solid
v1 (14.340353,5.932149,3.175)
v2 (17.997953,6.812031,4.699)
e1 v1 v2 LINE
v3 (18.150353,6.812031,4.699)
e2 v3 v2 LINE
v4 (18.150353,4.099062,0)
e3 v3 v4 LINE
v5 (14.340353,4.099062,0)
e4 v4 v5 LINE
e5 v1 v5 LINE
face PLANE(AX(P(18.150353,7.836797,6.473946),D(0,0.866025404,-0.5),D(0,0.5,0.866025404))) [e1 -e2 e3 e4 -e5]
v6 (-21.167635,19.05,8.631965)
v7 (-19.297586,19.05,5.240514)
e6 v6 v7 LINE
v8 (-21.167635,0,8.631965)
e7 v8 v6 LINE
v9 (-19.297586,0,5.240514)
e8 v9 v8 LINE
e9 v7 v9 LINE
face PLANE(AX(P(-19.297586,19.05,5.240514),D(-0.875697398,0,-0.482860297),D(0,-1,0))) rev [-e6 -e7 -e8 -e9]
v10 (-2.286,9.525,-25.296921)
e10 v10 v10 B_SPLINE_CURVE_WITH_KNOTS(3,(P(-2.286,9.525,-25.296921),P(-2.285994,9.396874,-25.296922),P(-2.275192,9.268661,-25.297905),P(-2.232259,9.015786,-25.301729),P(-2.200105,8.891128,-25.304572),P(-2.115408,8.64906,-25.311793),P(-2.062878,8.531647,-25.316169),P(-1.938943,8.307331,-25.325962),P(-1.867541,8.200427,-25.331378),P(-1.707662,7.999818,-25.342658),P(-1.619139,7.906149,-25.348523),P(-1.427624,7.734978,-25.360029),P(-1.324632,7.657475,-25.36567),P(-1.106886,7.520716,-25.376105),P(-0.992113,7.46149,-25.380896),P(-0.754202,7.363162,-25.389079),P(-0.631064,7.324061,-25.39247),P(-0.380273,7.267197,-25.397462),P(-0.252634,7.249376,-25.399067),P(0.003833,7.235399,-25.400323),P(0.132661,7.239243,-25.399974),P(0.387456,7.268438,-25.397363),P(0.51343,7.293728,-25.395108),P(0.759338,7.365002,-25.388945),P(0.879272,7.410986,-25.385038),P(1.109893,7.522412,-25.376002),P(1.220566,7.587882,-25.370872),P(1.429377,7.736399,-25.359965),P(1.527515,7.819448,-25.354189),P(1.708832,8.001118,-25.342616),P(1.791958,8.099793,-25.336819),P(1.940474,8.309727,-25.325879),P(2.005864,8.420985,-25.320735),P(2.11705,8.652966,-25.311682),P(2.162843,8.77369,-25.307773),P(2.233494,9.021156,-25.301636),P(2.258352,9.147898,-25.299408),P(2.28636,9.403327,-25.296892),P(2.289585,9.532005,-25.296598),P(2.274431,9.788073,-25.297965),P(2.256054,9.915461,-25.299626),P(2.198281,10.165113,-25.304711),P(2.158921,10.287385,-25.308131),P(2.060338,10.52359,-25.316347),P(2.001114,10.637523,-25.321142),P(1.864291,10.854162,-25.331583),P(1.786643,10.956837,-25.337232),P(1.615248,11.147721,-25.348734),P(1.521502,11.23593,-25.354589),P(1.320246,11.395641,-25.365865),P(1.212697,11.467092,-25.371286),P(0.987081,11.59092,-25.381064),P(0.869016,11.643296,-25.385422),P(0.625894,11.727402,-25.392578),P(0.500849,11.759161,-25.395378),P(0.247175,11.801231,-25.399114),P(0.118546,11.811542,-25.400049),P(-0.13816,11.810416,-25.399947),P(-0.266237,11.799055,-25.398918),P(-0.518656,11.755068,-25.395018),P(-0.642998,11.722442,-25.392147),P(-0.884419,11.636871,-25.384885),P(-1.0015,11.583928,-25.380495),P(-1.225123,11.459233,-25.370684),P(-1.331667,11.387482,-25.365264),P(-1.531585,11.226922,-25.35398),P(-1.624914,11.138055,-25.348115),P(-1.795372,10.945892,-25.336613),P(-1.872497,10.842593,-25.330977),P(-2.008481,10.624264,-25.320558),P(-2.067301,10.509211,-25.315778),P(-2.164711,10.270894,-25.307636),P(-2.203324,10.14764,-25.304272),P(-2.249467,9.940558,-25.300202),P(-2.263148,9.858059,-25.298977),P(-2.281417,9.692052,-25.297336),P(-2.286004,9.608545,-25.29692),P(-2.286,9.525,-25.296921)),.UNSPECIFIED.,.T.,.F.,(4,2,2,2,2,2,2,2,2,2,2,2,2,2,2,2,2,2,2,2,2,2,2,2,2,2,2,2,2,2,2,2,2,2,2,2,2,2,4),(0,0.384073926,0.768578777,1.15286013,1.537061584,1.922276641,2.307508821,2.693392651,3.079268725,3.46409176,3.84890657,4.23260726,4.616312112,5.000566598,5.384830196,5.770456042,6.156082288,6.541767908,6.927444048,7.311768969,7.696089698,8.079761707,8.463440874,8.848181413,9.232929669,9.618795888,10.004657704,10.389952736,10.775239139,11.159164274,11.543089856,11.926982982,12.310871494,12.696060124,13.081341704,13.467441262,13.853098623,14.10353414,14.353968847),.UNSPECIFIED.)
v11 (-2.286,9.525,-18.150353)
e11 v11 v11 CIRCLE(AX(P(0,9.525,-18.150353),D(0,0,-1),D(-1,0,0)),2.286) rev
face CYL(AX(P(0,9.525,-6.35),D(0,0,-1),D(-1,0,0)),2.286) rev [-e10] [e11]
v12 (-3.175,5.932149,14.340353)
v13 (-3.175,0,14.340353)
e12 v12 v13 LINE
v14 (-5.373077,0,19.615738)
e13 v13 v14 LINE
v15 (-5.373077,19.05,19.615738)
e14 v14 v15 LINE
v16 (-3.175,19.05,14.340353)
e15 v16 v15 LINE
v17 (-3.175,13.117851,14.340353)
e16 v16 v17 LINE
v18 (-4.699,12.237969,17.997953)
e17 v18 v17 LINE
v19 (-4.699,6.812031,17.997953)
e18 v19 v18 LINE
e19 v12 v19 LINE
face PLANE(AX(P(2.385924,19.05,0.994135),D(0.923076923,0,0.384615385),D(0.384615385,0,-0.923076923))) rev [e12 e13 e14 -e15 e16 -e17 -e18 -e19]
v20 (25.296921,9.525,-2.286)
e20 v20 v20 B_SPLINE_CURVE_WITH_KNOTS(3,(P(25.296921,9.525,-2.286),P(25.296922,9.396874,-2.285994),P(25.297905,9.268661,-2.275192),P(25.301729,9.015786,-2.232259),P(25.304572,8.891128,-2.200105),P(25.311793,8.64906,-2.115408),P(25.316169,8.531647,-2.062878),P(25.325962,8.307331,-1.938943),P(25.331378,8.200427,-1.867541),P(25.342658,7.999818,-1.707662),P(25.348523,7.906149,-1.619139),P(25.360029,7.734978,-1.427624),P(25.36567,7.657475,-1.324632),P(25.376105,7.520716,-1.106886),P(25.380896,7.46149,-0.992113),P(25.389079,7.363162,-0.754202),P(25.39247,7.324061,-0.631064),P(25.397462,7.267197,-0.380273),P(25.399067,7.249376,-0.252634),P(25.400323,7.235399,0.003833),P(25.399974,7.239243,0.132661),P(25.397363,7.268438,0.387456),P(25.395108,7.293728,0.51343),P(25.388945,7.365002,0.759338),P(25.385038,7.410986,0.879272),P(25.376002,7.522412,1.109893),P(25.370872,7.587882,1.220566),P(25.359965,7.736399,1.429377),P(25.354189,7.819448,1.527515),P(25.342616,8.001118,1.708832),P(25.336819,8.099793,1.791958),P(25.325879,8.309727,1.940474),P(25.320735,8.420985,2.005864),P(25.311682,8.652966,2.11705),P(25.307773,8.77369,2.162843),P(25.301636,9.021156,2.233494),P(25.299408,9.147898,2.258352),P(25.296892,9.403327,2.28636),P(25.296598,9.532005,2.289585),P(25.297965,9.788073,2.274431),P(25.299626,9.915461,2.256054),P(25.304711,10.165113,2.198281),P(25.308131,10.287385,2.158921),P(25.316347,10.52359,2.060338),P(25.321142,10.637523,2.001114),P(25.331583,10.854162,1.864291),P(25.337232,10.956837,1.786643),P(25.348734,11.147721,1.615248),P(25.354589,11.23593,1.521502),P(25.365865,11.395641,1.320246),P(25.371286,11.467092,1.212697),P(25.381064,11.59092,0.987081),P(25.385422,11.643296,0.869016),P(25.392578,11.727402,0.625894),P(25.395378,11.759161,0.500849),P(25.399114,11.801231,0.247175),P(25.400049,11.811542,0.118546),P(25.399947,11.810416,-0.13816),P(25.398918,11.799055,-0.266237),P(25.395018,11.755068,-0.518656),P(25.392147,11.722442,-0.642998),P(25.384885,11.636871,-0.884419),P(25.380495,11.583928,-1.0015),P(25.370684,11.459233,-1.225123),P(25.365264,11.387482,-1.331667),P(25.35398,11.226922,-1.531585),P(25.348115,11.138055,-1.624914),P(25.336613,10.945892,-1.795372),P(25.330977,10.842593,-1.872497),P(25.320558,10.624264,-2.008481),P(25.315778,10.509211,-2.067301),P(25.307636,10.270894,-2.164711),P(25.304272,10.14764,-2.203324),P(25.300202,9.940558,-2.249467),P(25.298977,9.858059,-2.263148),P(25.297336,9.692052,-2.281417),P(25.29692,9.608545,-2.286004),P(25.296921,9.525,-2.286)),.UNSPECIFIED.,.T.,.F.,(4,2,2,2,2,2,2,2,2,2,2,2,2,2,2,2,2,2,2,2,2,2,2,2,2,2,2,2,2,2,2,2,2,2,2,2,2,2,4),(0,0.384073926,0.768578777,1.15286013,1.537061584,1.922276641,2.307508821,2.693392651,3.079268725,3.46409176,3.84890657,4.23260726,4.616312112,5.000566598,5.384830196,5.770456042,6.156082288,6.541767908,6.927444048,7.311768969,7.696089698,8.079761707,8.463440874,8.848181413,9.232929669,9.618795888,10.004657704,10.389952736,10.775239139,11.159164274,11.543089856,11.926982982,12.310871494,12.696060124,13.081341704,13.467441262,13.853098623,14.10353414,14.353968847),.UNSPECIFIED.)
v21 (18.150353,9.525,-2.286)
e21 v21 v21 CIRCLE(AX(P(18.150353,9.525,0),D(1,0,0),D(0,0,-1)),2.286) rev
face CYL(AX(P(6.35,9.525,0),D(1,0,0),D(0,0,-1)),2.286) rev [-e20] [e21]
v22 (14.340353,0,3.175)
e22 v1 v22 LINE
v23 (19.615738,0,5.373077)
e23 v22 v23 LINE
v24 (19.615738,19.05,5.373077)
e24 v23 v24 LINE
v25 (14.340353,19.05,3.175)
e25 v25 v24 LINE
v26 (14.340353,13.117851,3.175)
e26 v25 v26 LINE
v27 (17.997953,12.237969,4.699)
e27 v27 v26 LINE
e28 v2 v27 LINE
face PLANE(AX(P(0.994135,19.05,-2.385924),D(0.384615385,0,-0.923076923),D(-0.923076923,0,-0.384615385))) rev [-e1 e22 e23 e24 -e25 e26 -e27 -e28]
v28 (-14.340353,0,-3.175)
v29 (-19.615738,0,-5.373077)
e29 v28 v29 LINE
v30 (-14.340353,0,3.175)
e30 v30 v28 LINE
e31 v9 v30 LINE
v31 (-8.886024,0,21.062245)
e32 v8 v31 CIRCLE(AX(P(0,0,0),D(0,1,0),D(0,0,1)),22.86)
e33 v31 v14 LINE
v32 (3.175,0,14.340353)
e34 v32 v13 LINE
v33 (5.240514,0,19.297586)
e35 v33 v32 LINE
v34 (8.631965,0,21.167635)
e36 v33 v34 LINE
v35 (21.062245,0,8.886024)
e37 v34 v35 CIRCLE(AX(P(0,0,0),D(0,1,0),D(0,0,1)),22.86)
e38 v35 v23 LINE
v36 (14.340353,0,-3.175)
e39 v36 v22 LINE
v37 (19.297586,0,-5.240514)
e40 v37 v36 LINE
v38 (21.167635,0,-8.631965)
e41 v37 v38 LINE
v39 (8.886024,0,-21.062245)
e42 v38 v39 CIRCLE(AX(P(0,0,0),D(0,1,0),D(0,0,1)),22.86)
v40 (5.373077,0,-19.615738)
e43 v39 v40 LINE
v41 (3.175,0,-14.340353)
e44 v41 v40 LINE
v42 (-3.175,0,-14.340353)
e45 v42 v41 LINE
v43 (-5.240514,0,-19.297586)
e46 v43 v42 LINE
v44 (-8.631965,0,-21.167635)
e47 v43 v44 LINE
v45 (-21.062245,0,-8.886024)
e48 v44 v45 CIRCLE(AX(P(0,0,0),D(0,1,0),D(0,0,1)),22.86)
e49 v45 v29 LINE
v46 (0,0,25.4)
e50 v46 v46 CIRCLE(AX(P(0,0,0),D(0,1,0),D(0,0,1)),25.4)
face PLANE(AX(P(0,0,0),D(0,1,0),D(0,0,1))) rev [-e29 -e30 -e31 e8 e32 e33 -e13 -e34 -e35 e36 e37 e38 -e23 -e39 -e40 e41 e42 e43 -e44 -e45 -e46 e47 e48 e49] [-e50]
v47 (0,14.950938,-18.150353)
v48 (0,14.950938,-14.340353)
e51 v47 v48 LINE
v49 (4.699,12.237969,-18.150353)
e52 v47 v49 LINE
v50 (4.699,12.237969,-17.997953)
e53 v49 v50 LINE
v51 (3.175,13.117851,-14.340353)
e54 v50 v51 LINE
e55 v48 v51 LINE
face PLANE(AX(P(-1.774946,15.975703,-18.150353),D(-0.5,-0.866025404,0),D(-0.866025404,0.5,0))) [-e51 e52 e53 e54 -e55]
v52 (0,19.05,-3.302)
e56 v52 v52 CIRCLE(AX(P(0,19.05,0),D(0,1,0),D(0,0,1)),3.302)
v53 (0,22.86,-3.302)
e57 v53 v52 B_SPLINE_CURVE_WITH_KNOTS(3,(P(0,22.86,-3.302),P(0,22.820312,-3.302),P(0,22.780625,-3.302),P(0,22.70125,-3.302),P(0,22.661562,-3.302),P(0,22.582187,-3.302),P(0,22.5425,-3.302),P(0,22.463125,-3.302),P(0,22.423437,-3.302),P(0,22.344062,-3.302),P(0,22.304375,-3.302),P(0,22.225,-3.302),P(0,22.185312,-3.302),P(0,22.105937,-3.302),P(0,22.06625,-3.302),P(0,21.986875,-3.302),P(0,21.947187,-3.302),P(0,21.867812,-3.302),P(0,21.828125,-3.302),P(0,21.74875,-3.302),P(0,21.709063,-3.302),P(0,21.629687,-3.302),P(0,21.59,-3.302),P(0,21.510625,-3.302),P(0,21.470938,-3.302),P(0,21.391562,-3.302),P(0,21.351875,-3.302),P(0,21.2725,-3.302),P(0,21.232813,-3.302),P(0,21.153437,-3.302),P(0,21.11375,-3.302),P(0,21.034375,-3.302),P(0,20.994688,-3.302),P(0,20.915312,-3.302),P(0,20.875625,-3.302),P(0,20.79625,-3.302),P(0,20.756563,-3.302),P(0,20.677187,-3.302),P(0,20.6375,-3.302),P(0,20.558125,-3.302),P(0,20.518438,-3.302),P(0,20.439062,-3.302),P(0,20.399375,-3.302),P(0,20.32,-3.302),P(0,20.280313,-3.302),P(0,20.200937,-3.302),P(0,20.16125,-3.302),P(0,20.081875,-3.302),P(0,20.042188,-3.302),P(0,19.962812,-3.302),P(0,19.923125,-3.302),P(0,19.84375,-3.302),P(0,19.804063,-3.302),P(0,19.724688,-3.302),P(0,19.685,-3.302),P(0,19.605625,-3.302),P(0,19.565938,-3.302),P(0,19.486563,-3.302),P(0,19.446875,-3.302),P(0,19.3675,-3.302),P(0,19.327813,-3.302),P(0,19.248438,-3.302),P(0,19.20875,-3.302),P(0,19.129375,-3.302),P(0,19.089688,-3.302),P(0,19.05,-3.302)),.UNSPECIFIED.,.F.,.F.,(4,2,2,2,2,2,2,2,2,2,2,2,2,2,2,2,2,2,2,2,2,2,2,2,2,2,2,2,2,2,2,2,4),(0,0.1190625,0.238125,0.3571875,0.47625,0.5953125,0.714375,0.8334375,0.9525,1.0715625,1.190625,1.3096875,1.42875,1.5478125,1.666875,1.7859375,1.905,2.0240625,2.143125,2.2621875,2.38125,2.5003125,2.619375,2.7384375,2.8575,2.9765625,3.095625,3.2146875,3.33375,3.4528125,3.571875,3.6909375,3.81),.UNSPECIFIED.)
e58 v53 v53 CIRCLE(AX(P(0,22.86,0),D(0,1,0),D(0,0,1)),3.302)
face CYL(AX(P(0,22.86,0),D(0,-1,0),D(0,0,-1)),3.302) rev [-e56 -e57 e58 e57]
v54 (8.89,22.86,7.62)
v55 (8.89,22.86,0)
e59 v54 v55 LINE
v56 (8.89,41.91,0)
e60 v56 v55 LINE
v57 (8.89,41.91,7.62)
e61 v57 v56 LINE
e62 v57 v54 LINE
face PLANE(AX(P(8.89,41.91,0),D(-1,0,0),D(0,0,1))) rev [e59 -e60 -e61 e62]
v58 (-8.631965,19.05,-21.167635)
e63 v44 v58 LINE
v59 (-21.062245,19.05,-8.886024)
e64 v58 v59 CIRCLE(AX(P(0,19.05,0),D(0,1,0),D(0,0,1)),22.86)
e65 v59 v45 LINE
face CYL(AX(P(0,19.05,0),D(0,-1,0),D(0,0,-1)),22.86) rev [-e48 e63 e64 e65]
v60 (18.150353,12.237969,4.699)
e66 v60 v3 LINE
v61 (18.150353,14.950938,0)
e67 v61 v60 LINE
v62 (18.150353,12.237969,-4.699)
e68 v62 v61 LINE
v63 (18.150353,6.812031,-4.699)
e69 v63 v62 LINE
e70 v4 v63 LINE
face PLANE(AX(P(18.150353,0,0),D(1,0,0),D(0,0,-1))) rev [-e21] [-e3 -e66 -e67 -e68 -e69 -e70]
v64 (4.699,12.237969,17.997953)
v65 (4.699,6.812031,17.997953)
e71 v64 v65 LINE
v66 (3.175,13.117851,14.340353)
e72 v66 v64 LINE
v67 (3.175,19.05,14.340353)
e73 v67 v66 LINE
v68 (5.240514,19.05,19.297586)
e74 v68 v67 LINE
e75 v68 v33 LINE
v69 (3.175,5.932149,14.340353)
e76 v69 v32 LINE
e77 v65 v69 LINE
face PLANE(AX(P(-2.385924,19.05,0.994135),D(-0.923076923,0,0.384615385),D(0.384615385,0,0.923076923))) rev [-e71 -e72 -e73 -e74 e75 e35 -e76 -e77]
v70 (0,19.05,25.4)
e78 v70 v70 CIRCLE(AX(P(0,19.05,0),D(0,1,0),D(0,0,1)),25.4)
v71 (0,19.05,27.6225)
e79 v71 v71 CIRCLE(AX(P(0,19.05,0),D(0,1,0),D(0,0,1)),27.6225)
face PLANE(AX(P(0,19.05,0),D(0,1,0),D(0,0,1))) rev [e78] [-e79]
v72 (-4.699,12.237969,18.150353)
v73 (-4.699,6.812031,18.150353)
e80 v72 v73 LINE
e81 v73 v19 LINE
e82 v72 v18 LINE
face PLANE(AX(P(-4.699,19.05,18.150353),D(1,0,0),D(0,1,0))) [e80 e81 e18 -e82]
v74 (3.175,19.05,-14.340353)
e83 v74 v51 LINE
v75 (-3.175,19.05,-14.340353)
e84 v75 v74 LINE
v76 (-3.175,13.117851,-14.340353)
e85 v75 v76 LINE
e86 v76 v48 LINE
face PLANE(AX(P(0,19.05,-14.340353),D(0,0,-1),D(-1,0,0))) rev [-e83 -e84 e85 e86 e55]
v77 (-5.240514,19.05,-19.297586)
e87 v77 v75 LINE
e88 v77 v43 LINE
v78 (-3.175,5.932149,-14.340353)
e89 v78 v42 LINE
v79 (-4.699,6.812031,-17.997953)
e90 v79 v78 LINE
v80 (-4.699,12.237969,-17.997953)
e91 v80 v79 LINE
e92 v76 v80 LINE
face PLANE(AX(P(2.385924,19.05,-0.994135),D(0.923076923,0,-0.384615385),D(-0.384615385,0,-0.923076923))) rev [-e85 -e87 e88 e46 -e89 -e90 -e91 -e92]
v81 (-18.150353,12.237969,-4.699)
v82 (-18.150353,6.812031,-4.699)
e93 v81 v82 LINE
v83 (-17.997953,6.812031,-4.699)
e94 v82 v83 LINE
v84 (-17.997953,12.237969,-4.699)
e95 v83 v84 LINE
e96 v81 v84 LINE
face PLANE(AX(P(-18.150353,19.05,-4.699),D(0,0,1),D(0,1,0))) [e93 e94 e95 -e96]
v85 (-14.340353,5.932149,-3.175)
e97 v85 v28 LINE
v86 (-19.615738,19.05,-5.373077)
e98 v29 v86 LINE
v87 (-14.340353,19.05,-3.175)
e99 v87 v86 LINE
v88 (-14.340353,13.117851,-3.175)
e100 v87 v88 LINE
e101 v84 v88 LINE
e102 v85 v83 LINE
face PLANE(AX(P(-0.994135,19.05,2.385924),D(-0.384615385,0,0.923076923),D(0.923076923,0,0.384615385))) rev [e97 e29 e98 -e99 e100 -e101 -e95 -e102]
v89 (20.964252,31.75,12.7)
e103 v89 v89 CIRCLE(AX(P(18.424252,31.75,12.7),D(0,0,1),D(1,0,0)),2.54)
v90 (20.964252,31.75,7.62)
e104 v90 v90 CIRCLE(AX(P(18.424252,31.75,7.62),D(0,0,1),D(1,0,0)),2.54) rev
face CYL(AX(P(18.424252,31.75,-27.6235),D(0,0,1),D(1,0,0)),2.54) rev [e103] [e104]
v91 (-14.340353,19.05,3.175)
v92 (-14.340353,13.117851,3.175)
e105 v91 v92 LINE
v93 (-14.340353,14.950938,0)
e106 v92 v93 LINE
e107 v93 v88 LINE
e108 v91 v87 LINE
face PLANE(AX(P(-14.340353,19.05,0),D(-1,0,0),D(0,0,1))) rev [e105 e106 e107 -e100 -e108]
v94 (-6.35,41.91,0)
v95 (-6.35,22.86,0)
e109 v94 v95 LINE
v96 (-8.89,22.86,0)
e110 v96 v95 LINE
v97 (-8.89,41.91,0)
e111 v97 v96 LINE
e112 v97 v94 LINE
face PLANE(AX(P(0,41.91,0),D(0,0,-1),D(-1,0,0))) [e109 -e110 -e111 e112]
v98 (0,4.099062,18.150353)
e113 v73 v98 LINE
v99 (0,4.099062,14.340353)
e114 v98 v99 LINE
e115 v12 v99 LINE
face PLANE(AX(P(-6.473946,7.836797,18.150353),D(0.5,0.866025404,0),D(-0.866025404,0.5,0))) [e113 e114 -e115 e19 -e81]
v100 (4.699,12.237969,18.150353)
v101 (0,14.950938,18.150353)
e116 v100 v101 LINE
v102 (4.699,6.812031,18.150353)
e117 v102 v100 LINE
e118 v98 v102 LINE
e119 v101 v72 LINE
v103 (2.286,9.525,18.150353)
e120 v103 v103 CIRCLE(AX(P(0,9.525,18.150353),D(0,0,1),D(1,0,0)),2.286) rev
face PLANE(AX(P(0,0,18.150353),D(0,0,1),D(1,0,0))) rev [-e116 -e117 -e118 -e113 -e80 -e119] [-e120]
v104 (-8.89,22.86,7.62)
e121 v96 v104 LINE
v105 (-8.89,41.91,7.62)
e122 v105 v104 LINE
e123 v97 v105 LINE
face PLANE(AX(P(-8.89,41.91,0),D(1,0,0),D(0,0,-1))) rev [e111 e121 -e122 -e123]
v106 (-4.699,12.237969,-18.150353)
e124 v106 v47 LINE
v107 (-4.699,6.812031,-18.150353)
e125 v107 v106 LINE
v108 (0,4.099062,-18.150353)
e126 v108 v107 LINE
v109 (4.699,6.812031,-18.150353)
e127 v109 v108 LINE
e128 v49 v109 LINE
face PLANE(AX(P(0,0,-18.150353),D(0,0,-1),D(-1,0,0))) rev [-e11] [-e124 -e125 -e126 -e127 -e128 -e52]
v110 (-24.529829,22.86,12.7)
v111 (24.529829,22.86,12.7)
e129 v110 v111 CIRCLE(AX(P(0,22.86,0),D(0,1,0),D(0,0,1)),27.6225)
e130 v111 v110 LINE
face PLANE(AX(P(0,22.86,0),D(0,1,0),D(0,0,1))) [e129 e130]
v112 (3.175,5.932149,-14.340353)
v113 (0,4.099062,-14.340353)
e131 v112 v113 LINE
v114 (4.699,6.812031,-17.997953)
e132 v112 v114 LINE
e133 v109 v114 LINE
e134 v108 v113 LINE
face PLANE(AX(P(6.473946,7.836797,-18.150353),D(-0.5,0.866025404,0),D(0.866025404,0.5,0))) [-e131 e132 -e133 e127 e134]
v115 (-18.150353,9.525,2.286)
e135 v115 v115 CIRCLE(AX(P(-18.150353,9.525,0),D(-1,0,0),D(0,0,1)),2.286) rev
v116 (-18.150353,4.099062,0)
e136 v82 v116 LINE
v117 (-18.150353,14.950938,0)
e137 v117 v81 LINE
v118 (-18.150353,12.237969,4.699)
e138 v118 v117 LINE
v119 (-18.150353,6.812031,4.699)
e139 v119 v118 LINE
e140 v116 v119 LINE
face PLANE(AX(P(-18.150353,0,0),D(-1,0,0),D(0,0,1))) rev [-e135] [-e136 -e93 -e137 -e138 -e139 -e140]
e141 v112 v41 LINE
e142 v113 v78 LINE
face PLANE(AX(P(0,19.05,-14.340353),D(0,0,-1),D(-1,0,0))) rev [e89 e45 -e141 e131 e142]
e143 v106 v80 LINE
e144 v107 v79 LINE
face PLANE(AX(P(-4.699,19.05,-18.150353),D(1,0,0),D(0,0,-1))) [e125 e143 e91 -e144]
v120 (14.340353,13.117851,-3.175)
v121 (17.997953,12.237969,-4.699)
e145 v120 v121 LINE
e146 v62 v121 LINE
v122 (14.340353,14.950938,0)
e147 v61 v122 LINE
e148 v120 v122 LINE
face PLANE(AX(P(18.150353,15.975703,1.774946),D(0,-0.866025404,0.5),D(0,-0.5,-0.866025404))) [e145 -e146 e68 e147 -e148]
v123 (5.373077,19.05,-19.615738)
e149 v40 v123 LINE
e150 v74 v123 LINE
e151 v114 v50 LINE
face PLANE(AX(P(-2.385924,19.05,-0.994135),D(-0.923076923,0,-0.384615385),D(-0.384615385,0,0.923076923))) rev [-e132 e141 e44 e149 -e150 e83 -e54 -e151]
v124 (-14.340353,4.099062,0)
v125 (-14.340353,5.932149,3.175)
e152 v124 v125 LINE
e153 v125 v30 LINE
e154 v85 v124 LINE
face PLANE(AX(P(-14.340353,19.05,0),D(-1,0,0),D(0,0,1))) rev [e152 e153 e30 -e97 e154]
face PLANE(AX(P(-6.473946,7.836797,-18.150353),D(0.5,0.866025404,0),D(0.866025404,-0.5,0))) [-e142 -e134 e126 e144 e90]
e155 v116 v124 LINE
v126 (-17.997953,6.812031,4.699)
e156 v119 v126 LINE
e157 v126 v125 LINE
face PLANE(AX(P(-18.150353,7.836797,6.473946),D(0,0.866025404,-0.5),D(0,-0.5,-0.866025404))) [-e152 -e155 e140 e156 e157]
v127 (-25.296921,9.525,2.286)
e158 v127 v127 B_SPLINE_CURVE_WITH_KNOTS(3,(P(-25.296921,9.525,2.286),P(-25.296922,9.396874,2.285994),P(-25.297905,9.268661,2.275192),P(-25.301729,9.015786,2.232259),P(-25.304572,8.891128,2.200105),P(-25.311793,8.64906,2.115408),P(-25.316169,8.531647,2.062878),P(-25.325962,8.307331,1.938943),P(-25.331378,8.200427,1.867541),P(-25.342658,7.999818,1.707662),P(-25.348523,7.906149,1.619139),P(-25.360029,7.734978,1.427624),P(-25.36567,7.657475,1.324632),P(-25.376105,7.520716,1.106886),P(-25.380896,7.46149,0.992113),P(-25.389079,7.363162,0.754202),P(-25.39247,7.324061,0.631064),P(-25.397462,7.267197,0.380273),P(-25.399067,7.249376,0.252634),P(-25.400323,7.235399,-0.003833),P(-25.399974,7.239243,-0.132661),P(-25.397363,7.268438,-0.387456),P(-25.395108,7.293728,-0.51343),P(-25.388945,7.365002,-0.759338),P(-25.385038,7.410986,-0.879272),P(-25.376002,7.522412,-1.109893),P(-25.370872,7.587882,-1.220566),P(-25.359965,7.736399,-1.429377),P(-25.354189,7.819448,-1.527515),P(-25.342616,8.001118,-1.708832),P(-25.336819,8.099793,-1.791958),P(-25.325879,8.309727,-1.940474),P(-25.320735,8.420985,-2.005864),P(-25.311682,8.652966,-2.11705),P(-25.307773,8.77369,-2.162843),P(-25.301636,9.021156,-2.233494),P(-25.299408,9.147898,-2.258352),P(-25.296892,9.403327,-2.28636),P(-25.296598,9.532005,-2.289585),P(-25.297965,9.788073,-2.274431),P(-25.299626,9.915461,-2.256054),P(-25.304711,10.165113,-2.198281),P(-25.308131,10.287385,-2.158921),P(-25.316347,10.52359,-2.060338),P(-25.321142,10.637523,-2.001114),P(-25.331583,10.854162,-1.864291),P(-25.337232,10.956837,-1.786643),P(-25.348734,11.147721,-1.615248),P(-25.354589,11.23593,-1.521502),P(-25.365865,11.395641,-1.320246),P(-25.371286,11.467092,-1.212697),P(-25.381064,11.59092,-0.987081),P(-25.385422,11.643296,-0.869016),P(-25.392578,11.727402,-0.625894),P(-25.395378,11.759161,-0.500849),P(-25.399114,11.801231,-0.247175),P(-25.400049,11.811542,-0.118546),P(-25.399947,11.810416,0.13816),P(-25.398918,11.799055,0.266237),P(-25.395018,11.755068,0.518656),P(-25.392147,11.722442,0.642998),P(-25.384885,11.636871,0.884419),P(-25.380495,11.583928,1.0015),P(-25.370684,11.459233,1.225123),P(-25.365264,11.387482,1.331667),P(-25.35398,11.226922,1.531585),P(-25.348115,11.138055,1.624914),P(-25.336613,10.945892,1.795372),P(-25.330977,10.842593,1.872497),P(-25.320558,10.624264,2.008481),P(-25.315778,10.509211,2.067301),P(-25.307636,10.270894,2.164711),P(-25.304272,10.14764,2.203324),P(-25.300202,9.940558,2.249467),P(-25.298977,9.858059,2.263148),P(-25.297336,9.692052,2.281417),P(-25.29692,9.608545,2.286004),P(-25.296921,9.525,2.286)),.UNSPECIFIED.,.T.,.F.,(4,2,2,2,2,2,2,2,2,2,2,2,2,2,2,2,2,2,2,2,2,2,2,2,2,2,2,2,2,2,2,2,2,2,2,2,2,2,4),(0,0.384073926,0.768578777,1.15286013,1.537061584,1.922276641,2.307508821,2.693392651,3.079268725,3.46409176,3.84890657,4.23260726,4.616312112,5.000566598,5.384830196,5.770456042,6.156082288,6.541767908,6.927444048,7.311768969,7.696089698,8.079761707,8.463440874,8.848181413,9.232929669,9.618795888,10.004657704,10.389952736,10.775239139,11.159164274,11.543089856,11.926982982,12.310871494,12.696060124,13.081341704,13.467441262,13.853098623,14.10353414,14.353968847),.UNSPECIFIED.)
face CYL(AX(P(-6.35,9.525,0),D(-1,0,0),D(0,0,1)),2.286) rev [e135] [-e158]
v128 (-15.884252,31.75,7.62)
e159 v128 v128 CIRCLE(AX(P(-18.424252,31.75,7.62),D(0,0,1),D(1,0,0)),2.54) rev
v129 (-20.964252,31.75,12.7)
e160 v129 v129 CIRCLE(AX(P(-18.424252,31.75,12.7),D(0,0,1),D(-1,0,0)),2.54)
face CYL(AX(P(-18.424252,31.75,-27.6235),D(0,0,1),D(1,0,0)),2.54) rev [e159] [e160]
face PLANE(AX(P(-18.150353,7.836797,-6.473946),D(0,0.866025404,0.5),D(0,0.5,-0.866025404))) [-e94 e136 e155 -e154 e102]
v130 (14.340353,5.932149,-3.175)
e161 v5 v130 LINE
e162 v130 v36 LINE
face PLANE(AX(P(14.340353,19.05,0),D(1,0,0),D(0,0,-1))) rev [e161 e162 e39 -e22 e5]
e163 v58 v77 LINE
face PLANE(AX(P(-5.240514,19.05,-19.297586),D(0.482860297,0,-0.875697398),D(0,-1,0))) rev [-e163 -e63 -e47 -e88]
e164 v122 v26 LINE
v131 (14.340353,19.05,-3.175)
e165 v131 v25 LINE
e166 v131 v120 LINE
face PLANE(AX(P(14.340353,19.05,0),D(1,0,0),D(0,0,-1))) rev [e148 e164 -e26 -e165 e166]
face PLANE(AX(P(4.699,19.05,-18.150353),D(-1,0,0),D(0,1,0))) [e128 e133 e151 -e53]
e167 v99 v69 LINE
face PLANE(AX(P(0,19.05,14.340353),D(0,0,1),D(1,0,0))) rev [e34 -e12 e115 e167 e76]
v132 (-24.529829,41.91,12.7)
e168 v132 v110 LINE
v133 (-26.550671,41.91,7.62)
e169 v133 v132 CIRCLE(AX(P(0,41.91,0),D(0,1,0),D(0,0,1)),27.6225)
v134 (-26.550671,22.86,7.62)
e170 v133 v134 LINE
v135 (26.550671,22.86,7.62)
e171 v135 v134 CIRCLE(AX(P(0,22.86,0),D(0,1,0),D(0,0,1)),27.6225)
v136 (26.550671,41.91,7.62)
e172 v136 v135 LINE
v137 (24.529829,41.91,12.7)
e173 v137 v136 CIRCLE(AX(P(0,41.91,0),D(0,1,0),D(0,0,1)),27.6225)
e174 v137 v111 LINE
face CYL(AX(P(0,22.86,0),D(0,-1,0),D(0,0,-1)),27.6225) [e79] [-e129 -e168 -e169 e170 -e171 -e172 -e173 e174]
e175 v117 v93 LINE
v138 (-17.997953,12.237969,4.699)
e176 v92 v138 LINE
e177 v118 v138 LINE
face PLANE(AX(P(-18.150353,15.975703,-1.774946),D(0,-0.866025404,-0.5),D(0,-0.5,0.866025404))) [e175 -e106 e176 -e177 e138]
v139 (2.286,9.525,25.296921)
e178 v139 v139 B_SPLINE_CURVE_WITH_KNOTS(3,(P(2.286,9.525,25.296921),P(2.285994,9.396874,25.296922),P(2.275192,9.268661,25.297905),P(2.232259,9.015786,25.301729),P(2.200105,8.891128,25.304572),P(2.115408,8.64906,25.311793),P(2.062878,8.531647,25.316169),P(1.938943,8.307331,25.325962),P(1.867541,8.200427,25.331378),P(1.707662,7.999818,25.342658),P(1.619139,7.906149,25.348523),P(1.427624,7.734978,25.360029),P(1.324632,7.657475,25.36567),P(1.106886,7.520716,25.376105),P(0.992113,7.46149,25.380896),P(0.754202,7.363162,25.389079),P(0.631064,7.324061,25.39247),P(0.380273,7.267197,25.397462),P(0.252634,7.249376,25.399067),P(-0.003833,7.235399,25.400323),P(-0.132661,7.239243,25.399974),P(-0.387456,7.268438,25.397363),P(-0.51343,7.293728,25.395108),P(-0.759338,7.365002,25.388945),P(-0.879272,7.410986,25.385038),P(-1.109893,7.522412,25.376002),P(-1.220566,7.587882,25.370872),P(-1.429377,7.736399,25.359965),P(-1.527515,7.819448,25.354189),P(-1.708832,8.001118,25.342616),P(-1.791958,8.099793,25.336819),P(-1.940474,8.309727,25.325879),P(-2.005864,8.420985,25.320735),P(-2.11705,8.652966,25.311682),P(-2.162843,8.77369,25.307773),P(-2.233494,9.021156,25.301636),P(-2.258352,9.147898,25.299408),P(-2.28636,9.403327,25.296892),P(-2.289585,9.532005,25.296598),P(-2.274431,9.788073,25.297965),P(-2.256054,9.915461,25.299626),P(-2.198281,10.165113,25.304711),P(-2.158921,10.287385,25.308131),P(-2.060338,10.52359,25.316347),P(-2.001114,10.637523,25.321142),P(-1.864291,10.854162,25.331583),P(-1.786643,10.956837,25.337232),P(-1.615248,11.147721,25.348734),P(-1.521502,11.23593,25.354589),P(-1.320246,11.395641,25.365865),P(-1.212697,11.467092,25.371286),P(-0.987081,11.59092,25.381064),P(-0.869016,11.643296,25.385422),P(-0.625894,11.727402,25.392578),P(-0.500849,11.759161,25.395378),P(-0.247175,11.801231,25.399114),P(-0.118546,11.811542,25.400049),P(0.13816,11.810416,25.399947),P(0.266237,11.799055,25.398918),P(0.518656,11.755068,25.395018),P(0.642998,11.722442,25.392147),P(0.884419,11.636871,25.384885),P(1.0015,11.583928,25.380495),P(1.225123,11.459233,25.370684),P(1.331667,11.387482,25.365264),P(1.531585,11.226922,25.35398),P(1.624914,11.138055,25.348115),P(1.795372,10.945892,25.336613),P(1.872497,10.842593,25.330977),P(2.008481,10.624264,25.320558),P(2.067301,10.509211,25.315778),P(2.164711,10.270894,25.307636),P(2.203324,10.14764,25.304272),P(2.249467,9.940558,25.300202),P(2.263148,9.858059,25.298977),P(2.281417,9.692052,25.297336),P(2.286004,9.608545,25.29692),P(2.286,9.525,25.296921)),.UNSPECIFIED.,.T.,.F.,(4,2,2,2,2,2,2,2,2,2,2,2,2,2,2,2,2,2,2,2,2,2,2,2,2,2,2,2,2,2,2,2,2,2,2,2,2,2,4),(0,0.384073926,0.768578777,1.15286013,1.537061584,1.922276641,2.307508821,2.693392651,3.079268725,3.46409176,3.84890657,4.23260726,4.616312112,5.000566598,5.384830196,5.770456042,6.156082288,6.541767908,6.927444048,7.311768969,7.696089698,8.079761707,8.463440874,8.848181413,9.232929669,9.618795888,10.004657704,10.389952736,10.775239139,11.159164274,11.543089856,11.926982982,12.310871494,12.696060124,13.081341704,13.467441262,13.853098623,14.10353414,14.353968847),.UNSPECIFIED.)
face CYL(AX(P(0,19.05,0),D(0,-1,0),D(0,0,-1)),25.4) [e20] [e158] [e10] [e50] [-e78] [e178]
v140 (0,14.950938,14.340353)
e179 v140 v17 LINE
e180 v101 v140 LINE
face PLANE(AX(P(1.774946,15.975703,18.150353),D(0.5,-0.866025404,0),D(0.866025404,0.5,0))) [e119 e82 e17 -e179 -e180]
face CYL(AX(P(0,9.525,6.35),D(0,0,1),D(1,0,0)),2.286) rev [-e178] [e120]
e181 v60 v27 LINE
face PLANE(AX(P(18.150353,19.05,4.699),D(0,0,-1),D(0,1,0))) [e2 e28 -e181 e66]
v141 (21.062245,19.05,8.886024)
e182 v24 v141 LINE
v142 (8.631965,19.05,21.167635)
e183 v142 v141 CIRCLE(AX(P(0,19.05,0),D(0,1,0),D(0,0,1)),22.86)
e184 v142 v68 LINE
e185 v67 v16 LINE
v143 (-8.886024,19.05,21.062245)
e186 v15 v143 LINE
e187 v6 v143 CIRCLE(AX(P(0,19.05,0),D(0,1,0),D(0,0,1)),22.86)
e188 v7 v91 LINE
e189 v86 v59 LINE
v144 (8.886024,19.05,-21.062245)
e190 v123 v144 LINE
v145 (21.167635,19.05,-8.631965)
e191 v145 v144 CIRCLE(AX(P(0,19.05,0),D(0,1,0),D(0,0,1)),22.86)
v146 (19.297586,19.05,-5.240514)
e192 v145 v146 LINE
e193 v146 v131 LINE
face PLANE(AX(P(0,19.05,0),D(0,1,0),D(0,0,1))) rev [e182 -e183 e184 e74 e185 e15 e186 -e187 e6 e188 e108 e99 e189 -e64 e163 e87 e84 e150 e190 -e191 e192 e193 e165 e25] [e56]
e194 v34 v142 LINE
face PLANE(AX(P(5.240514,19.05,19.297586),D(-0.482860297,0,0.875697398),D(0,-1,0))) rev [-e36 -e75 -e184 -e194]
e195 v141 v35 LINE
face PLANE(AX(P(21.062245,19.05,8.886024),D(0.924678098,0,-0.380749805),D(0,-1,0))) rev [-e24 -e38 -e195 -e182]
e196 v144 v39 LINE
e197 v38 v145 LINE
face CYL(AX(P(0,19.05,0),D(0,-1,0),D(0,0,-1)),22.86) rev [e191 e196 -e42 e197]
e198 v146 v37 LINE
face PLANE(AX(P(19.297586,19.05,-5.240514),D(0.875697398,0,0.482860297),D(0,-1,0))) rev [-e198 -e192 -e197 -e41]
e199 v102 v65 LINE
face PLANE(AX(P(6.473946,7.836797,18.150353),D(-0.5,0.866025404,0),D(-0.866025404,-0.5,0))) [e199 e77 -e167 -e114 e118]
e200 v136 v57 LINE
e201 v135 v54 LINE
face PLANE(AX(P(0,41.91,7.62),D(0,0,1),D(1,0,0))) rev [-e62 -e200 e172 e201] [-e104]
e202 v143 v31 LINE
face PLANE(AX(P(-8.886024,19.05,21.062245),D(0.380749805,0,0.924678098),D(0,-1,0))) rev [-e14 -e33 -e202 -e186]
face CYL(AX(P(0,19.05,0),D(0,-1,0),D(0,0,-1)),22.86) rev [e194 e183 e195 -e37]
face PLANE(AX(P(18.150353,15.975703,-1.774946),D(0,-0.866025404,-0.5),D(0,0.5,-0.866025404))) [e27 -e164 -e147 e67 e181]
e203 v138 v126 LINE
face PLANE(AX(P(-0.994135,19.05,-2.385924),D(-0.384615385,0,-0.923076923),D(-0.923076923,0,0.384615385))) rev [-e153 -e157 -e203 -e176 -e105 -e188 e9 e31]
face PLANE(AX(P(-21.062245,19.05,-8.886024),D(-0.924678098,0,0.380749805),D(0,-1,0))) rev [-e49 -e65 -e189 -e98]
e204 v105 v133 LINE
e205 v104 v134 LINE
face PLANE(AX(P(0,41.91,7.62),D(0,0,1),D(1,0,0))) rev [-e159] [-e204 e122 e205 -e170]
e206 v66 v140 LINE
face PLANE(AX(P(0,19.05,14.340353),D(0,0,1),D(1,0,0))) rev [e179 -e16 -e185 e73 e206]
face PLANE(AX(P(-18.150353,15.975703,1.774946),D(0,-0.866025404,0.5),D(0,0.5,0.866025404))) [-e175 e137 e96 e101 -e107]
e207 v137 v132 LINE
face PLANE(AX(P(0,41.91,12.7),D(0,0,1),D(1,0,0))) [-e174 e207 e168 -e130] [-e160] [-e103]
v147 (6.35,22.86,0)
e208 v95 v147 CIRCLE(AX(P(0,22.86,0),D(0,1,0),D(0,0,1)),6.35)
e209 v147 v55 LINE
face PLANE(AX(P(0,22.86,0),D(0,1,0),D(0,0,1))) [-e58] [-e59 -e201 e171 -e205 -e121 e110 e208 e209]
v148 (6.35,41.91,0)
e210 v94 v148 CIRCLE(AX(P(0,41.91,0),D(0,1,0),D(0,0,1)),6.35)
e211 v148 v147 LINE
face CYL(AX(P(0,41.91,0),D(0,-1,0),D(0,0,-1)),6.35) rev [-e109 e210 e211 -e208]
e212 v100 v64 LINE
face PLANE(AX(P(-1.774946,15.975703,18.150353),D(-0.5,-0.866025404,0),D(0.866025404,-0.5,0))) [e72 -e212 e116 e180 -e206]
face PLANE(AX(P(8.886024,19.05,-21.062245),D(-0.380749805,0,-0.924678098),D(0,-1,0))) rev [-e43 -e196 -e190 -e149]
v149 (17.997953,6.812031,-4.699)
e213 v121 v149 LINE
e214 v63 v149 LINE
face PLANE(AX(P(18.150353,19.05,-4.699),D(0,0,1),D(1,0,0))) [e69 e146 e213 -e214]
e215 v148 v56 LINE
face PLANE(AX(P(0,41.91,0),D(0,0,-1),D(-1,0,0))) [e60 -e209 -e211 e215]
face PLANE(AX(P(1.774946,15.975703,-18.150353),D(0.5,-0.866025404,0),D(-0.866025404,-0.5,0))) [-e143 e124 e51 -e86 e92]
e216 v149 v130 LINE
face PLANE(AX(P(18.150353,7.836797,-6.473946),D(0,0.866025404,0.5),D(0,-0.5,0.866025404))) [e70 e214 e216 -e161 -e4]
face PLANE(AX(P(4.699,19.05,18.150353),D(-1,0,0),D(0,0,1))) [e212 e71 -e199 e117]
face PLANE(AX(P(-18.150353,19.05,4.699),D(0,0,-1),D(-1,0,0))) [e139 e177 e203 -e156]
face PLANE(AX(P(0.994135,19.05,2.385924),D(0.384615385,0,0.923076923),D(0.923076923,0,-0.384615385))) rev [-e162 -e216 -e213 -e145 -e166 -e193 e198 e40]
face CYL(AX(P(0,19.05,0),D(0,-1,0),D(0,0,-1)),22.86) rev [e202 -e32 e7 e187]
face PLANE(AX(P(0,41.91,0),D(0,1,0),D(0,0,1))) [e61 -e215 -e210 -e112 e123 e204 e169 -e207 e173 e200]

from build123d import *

# Parameters (mm, degrees)
SKETCH1_R                  = 25.4
SKETCH1_R_2                = 22.86
TUBE_CONNECTION_RING_DEPTH = 19.05
SKETCH6_R                  = 2.286
SCREW_HOLE_DEPTH           = 19.05
NUT_PRESS_FIT_HOLE_START   = -11.059647
NUT_PRESS_FIT_HOLE_DEPTH   = 3.81
CIRPATTERN1_COUNT          = 4
SCREW_HOLE_CHAMFER_SIZE    = 2.884664172
SCREW_HOLE_CHAMFER_SIZE_2  = 2.54
SKETCH12_R                 = 27.6225
SKETCH12_R_2               = 3.302
TOP_PLATE_DEPTH            = 3.81
HINGE_HOLE_DEPTH           = 19.05
HINGE_HOLE_CUT_REACH       = 66.384
SKETCH14_R                 = 2.54


with BuildPart() as part:
    # Sketch1 → tube_connection_ring (new body)
    # profile 1 of 5: a face of its own
    with BuildSketch(Plane(origin=(0, 0, 0), x_dir=(1, 0, 0), z_dir=(0, 1, 0))):
        with Locations(Location((0, 0, 0), (0, 0, 90))):
            Circle(SKETCH1_R)
        Circle(SKETCH1_R_2, mode=Mode.SUBTRACT)
    # profile 2 of 5: a face of its own
    with BuildSketch(Plane(origin=(0, 0, 0), x_dir=(1, 0, 0), z_dir=(0, 1, 0))):
        with BuildLine():
            ThreePointArc((22.86, 0), (22.633970791, 3.206706444), (21.960352912, 6.35))
            Line((21.960352912, 6.35), (14.340352912, 3.175))
            Line((14.340352912, 3.175), (14.340352912, -3.175))
            Line((14.340352912, -3.175), (21.960352912, -6.35))
            ThreePointArc((21.960352912, -6.35), (22.633970791, -3.206706444), (22.86, 0))
        make_face()
    # profile 3 of 5: a face of its own
    with BuildSketch(Plane(origin=(0, 0, 0), x_dir=(1, 0, 0), z_dir=(0, 1, 0))):
        with BuildLine():
            ThreePointArc((-6.35, -21.960352912), (0, -22.86), (6.35, -21.960352912))
            Line((6.35, -21.960352912), (3.175, -14.340352912))
            Line((3.175, -14.340352912), (-3.175, -14.340352912))
            Line((-3.175, -14.340352912), (-6.35, -21.960352912))
        make_face()
    # profile 4 of 5: a face of its own
    with BuildSketch(Plane(origin=(0, 0, 0), x_dir=(1, 0, 0), z_dir=(0, 1, 0))):
        with BuildLine():
            Line((-14.340352912, 3.175), (-21.960352912, 6.35))
            ThreePointArc((-21.960352912, 6.35), (-22.86, 0), (-21.960352912, -6.35))
            Line((-21.960352912, -6.35), (-14.340352912, -3.175))
            Line((-14.340352912, -3.175), (-14.340352912, 3.175))
        make_face()
    # profile 5 of 5: a face of its own
    with BuildSketch(Plane(origin=(0, 0, 0), x_dir=(1, 0, 0), z_dir=(0, 1, 0))):
        with BuildLine():
            Line((3.175, 14.340352912), (6.35, 21.960352912))
            ThreePointArc((6.35, 21.960352912), (0, 22.86), (-6.35, 21.960352912))
            Line((-6.35, 21.960352912), (-3.175, 14.340352912))
            Line((-3.175, 14.340352912), (3.175, 14.340352912))
        make_face()
    extrude(amount=TUBE_CONNECTION_RING_DEPTH)

    # Sketch6 → screw_hole (cut)
    with BuildSketch(Plane(origin=(25.4, 0, 0), x_dir=(0, 0, -1), z_dir=(1, 0, 0))):
        with Locations((0, 9.525)):
            Circle(SKETCH6_R)
    screw_hole = extrude(amount=-SCREW_HOLE_DEPTH, mode=Mode.SUBTRACT)

    # Sketch11 → nut_press_fit_hole (cut)
    with BuildSketch(Plane(origin=(25.4, 0, 0), x_dir=(0, 0, -1), z_dir=(1, 0, 0)).offset(NUT_PRESS_FIT_HOLE_START)):
        Polygon((0, 4.09906217), (4.699, 6.812031085), (4.699, 12.237968915), (0, 14.95093783), (-4.699, 12.237968915), (-4.699, 6.812031085), align=None)
    nut_press_fit_hole = extrude(amount=NUT_PRESS_FIT_HOLE_DEPTH, mode=Mode.SUBTRACT)

    # CirPattern1: screw_hole, nut_press_fit_hole ×4 about axis
    cirpattern1_axis = Axis((0, 0, 0), (0, 1, 0))
    add([screw_hole.rotate(cirpattern1_axis, i * 360 / CIRPATTERN1_COUNT) for i in range(1, CIRPATTERN1_COUNT)], mode=Mode.SUBTRACT)
    add([nut_press_fit_hole.rotate(cirpattern1_axis, i * 360 / CIRPATTERN1_COUNT) for i in range(1, CIRPATTERN1_COUNT)], mode=Mode.SUBTRACT)

    # screw_hole_chamfer
    # the kernel refuses this chamfer: 2.884664172, 2.54 mm, written as the material it adds along each edge
    with BuildSketch(Plane(origin=(-6.35, 0, -21.960352912), x_dir=(-0.9446263547307573, 0, 0.32814790864499105), z_dir=(0, 1, 0)), Plane(origin=(-21.960352912, 0, 6.35), x_dir=(0.3281479086449895, 0, 0.944626354730758), z_dir=(0, 1, 0)), Plane(origin=(6.35, 0, 21.960352912), x_dir=(0.9446263547307586, 0, -0.32814790864498755), z_dir=(0, 1, 0)), Plane(origin=(21.960352912, 0, -6.35), x_dir=(-0.3281479086449886, 0, -0.9446263547307582), z_dir=(0, 1, 0))) as screw_hole_chamfer_piece_1:
        with BuildLine():
            Line((2.415733057, 0), (-SCREW_HOLE_CHAMFER_SIZE * 0.0604120669079, SCREW_HOLE_CHAMFER_SIZE * 0.998173522936))
            Line((-SCREW_HOLE_CHAMFER_SIZE * 0.0604120669079, SCREW_HOLE_CHAMFER_SIZE * 0.998173522936), (0, 0))
            ThreePointArc((0, 0), (1.246430784, -0.031900132), (2.415733057, 0))
        make_face()
    extrude(amount=19.05)
    with BuildSketch(Plane(origin=(-21.960352912, 0, -6.35), x_dir=(0.9230769230769231, 0, 0.38461538461538464), z_dir=(0, 1, 0)), Plane(origin=(-6.35, 0, 21.960352912), x_dir=(0.3846153846153849, 0, -0.9230769230769229), z_dir=(0, 1, 0)), Plane(origin=(21.960352912, 0, 6.35), x_dir=(-0.9230769230769229, 0, -0.3846153846153849), z_dir=(0, 1, 0))) as screw_hole_chamfer_piece_2:
        with BuildLine():
            Line((SCREW_HOLE_CHAMFER_SIZE_2, 0), (-0.146371443, 2.686371443))
            ThreePointArc((-0.146371443, 2.686371443), (-0.11503611, 1.383925534), (0, 0))
            Line((0, 0), (SCREW_HOLE_CHAMFER_SIZE_2, 0))
        make_face()
    extrude(amount=19.05)
    with BuildSketch(Plane(origin=(6.35, 0, -21.960352912), x_dir=(0.9426351264301257, 0, 0.3338248319404367), z_dir=(0, 1, 0))) as screw_hole_chamfer_piece_3:
        with BuildLine():
            Line((2.690356134, 0), (-SCREW_HOLE_CHAMFER_SIZE_2 * 0.0544059729896, -SCREW_HOLE_CHAMFER_SIZE_2 * 0.99851889822))
            Line((-SCREW_HOLE_CHAMFER_SIZE_2 * 0.0544059729896, -SCREW_HOLE_CHAMFER_SIZE_2 * 0.99851889822), (0, 0))
            ThreePointArc((0, 0), (1.388134451, 0.039571914), (2.690356134, 0))
        make_face()
    extrude(amount=19.05)

    # Sketch12 → top_plate (add)
    with BuildSketch(Plane(origin=(0, 19.05, 0), x_dir=(1, 0, 0), z_dir=(0, 1, 0))):
        with Locations(Location((0, 0, 0), (0, 0, 90))):
            Circle(SKETCH12_R)
        with Locations(Location((0, 0, 0), (0, 0, 90))):
            Circle(SKETCH12_R_2, mode=Mode.SUBTRACT)
    extrude(amount=TOP_PLATE_DEPTH)

    # Sketch13 → hinge_hole (add)
    with BuildSketch(Plane(origin=(0, 22.86, 0), x_dir=(1, 0, 0), z_dir=(0, 1, 0))):
        with BuildLine():
            ThreePointArc((24.529828908, -12.7), (25.666241564, -10.210119991), (26.550670542, -7.62))
            Line((26.550670542, -7.62), (8.89, -7.62))
            Line((8.89, -7.62), (8.89, 0))
            Line((8.89, 0), (6.35, 0))
            ThreePointArc((6.35, 0), (0, -6.35), (-6.35, 0))
            Line((-6.35, 0), (-8.89, 0))
            Line((-8.89, 0), (-8.89, -7.62))
            Line((-8.89, -7.62), (-26.550670542, -7.62))
            ThreePointArc((-26.550670542, -7.62), (-25.666241564, -10.210119991), (-24.529828908, -12.7))
            Line((-24.529828908, -12.7), (24.529828908, -12.7))
        make_face()
    extrude(amount=HINGE_HOLE_DEPTH)

    # Sketch14 → hinge_hole_cut (cut, up to next)
    with BuildSketch(Plane.XY.offset(12.7), mode=Mode.PRIVATE) as hinge_hole_cut_sk1:
        with Locations((18.424251671, 31.75)):
            Circle(SKETCH14_R)
    hinge_hole_cut_tool1 = extrude(hinge_hole_cut_sk1.sketch, amount=-HINGE_HOLE_CUT_REACH, mode=Mode.PRIVATE) & part.part
    # Sketch14 → hinge_hole_cut (cut, up to next)
    with BuildSketch(Plane.XY.offset(12.7), mode=Mode.PRIVATE) as hinge_hole_cut_sk2:
        with Locations((-18.424251671, 31.75)):
            Circle(SKETCH14_R)
    hinge_hole_cut_tool2 = extrude(hinge_hole_cut_sk2.sketch, amount=-HINGE_HOLE_CUT_REACH, mode=Mode.PRIVATE) & part.part
    add(hinge_hole_cut_tool1.solids().sort_by_distance((18.424252, 31.75, 12.7))[0], mode=Mode.SUBTRACT)
    add(hinge_hole_cut_tool2.solids().sort_by_distance((-18.424252, 31.75, 12.7))[0], mode=Mode.SUBTRACT)


solid = part.part
